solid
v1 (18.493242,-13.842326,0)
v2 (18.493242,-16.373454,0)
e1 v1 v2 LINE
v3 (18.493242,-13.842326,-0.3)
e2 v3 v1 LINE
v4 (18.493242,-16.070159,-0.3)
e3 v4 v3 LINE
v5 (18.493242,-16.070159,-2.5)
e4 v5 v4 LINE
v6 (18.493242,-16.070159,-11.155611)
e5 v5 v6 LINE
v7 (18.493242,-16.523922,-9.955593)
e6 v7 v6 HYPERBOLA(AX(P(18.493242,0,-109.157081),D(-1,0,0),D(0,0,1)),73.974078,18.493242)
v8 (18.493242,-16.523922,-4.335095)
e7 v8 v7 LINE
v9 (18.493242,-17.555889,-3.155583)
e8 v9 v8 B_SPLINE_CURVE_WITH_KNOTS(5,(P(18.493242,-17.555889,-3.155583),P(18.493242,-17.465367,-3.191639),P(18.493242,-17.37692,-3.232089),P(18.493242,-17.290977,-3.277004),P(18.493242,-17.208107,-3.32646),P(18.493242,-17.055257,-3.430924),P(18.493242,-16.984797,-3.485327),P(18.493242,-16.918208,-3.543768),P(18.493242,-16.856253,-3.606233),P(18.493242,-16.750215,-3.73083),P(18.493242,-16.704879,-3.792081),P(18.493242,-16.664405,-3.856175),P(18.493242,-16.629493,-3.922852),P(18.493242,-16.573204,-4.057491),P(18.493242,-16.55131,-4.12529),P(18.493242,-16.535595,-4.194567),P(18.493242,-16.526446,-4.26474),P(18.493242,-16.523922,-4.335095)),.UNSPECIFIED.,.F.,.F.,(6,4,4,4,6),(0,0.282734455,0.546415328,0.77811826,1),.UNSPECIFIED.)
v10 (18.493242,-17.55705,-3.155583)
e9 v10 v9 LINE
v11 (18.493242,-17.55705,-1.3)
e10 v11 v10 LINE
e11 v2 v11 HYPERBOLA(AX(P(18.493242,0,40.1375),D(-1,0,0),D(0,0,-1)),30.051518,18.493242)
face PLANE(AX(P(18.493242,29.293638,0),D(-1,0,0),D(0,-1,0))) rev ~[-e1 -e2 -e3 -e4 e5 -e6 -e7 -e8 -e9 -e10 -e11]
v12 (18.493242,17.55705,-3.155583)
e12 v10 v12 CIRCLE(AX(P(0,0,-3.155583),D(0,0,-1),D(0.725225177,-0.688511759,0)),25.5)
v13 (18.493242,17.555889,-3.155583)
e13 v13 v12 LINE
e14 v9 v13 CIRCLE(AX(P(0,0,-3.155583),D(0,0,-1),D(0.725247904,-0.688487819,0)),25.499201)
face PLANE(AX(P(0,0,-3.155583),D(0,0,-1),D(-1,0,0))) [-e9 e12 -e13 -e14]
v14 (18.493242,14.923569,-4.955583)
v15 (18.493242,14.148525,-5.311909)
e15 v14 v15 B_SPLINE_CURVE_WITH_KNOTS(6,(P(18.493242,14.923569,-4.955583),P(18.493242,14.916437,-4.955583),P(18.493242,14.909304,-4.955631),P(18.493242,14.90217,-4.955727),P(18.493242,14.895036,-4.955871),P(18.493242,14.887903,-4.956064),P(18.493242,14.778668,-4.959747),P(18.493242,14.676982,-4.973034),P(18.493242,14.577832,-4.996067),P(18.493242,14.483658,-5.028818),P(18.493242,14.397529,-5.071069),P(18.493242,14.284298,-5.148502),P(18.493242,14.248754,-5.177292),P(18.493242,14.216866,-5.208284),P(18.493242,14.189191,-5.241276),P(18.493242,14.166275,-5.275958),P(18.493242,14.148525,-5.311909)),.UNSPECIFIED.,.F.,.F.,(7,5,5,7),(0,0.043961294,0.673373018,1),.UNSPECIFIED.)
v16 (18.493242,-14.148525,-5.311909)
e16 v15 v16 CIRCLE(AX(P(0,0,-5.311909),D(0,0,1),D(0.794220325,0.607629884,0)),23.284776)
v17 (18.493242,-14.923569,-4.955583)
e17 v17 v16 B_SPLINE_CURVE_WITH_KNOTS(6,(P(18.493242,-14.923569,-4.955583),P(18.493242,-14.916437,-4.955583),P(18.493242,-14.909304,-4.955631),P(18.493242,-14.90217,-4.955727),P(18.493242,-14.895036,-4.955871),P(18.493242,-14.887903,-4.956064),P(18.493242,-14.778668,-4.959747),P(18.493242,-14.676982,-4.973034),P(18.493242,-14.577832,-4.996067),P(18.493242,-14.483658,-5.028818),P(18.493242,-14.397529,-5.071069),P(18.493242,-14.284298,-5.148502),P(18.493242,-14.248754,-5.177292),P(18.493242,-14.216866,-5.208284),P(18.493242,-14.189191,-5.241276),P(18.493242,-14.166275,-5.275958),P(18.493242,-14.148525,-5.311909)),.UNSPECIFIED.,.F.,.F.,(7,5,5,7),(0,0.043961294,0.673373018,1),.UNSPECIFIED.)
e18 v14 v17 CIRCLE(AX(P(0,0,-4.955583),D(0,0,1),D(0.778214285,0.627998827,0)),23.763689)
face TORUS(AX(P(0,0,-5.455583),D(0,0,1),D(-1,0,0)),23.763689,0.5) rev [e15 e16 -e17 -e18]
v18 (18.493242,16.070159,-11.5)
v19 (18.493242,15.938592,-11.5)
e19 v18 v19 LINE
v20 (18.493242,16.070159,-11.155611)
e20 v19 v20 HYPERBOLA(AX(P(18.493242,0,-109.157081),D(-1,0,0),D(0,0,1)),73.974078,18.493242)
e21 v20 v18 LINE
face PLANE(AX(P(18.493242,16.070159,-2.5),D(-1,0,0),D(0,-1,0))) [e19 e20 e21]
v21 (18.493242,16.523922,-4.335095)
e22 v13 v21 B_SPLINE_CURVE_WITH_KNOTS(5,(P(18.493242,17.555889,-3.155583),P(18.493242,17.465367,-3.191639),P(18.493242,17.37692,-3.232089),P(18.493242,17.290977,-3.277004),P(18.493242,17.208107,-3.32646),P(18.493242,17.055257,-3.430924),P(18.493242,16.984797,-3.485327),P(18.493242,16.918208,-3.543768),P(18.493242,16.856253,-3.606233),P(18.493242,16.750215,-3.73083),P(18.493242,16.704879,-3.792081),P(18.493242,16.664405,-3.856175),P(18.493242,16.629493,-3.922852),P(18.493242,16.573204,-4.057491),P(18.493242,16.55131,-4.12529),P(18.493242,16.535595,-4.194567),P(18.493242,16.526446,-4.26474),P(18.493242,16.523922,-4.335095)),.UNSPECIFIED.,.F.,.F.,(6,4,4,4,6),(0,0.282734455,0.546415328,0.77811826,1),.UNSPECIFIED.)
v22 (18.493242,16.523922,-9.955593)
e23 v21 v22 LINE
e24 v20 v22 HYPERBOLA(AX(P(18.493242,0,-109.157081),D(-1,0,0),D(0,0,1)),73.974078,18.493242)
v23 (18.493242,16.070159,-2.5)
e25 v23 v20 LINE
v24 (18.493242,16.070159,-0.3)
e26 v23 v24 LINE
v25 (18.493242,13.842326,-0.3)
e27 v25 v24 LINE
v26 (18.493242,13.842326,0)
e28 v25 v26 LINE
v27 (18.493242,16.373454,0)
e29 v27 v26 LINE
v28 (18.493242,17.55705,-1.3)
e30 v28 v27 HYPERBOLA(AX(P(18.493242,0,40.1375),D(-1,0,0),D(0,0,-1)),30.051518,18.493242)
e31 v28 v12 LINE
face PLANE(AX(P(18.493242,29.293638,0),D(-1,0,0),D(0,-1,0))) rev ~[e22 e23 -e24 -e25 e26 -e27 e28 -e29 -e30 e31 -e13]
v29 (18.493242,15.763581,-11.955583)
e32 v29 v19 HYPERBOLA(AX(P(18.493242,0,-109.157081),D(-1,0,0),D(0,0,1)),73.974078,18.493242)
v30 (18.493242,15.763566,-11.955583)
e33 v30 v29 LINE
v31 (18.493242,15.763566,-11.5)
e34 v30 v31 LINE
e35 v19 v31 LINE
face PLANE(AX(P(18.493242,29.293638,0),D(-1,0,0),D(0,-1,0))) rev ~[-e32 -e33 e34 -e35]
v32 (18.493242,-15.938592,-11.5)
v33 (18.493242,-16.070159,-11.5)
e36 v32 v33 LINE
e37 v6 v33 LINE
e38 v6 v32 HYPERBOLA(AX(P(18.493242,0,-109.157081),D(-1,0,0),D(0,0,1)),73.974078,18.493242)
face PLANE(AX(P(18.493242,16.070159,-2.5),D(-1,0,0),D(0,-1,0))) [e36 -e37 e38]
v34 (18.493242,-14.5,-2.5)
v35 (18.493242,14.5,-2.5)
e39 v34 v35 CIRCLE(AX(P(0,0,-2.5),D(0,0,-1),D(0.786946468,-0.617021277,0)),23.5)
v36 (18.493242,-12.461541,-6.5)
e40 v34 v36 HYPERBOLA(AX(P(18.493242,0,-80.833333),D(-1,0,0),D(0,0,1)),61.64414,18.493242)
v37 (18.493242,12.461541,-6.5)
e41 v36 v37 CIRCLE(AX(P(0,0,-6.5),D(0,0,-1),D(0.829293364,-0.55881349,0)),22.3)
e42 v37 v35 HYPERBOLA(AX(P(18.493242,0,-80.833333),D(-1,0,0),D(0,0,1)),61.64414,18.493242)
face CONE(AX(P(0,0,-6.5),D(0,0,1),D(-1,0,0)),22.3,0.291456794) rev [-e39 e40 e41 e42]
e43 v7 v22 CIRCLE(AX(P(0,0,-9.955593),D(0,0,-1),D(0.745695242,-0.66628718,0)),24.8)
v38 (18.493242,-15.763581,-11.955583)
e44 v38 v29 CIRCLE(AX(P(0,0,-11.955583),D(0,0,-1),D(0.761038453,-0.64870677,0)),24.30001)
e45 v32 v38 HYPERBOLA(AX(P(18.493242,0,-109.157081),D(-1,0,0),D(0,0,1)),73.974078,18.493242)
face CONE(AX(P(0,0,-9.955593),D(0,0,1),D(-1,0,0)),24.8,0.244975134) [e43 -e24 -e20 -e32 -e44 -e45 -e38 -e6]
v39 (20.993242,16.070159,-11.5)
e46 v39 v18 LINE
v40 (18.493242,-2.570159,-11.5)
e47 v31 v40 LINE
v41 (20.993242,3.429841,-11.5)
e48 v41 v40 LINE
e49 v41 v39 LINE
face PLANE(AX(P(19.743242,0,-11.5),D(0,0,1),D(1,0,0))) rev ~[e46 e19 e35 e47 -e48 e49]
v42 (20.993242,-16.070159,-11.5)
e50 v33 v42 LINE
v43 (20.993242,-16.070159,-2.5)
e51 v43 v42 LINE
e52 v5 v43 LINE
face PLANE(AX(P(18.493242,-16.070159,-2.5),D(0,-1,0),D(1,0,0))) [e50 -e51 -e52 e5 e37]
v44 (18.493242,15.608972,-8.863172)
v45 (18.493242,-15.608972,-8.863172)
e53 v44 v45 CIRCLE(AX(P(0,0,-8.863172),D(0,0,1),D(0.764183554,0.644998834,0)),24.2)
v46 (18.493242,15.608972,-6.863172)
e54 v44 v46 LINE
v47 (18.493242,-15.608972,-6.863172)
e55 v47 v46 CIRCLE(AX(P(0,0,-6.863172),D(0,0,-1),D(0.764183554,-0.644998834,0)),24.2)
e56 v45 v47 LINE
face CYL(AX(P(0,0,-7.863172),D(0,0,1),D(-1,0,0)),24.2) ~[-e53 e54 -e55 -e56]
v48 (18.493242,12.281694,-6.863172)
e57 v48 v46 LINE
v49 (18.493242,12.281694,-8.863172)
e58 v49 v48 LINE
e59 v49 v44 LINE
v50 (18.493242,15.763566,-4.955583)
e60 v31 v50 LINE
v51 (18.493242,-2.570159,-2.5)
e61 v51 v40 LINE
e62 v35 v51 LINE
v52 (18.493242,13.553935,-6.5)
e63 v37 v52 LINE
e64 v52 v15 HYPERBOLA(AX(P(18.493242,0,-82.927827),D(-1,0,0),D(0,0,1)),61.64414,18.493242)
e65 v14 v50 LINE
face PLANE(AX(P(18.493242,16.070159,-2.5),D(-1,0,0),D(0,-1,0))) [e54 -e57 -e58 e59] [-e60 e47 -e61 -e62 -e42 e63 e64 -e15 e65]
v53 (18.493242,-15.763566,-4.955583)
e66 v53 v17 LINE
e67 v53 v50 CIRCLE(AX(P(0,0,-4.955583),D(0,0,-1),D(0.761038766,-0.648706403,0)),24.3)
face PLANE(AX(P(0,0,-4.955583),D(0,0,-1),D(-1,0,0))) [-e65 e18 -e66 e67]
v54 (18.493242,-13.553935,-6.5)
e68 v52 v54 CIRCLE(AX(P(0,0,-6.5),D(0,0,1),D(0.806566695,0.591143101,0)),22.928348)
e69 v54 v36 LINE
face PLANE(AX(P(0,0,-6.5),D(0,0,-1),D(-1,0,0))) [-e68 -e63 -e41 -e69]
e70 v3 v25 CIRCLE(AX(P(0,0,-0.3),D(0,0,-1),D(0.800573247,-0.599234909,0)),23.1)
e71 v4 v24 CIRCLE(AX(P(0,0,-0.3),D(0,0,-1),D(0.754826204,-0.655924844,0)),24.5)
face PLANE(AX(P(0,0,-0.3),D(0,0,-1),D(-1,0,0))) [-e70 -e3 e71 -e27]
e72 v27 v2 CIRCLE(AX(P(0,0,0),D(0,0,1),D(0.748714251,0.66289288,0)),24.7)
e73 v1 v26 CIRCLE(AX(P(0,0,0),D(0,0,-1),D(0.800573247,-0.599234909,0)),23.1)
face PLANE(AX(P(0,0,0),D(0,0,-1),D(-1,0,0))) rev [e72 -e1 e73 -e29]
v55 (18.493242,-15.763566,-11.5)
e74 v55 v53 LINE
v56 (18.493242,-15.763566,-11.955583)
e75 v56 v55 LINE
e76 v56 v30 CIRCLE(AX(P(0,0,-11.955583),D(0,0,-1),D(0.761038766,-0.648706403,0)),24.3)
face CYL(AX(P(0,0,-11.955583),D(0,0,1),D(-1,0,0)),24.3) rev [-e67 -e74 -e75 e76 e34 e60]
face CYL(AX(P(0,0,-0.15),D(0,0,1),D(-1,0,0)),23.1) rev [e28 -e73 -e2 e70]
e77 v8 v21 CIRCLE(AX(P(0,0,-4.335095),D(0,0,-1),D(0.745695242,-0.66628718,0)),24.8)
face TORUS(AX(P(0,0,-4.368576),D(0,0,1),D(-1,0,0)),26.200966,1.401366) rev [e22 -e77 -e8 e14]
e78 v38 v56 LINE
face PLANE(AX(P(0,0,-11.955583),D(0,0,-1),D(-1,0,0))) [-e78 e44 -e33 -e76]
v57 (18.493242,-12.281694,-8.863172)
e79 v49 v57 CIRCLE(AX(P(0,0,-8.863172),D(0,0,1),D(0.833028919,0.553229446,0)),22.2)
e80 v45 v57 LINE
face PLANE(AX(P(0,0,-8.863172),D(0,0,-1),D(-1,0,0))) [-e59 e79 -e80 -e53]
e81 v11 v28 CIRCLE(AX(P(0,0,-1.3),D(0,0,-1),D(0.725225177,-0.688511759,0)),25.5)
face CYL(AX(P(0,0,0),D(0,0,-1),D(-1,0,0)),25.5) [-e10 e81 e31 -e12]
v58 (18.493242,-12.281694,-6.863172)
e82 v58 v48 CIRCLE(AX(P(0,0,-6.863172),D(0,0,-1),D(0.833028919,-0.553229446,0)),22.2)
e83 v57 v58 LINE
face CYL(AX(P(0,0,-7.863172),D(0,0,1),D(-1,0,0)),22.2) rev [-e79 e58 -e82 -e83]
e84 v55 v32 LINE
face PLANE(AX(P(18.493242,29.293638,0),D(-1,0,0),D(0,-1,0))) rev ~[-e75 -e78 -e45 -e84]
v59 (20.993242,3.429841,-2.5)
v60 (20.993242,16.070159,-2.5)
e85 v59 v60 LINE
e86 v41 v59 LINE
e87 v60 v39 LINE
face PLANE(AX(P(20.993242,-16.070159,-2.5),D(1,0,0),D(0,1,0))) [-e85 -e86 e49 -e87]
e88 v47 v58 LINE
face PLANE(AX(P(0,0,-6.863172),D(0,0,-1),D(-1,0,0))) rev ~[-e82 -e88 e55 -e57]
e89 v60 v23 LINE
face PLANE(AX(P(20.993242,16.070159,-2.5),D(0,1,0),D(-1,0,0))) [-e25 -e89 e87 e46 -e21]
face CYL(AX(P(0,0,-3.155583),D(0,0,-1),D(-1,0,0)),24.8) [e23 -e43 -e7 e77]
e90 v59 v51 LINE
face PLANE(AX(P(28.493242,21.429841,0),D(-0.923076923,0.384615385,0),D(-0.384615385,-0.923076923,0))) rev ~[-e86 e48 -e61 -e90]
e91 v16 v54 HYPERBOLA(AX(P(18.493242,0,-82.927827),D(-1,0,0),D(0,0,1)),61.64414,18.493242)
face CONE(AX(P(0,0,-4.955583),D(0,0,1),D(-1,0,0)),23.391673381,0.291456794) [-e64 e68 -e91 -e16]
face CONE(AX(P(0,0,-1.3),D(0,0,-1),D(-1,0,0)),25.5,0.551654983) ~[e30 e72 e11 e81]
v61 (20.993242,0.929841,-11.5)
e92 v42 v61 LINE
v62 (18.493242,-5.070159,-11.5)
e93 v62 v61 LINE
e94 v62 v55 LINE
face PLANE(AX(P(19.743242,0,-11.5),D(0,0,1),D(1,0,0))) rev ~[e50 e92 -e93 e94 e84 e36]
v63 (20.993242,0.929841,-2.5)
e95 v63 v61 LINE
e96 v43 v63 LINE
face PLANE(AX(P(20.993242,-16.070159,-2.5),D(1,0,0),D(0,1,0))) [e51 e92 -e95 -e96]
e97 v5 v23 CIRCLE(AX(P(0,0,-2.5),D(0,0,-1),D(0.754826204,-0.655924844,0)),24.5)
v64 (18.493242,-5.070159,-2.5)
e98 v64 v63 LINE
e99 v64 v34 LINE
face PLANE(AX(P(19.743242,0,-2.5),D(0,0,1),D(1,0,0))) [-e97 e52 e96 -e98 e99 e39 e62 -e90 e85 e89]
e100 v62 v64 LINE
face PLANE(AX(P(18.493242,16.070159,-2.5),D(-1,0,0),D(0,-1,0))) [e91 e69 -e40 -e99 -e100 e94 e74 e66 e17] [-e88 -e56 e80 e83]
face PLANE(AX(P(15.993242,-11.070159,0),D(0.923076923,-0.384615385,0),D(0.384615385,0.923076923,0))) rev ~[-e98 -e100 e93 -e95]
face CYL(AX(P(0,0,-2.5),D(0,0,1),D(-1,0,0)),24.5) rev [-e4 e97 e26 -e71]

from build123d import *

# Parameters (mm, degrees)
F0_W      = 1.4
F0_H      = 0.3
F0_W_2    = 2
F0_H_2    = 2
F4_SIZE2  = 0.49999
F4_SIZE   = 1.99999
F5_R      = 0.5
F7_DEPTH  = 25
F9_DEPTH  = 9
F11_DEPTH = 100


# Not quite as in the source:
# - a fillet or chamfer that OpenCascade refuses, or shapes differently, is made with other operations: its cross-section is extruded or revolved along the edge and cut away or added
# - a fillet or chamfer is up to 0.001 mm smaller than in the source, because OpenCascade refuses the exact size


with BuildPart() as f1:
    # F0 (on Front) → F1 (revolve)
    with BuildSketch(Plane.XZ):
        Polygon((-24.5, 0), (-25.5, 0), (-25.5, -3.1555826106), (-24.8, -3.1555826106), (-24.8, -11.9555826106), (-24.3, -11.9555826106), (-24.3, -4.9555826106), (-23.391673381, -4.9555826106), (-22.9283481642, -6.5), (-22.3, -6.5), (-23.5, -2.5), (-24.5, -2.5), (-24.5, -0.3), align=None)
        with Locations((-23.8, -0.15)):
            Rectangle(F0_W, F0_H)
    revolve(axis=Axis((0, 0, 1.0689813644), (0, 0, -1)))

    # F2: chamfer of 0.8 x 1.3 on 1 edges, made by hand

    # F2_s1 → F2_t2 (revolve, cut)
    with BuildSketch(Plane.XZ):
        Polygon((-25.5, -1.3), (-24.7, 0), (-25.5, 0), align=None)
    revolve(axis=Axis((0, 0, 0), (0, 0, -1)), mode=Mode.SUBTRACT)

    # F3: fillet of radius 1.4 on 1 edges, made by hand

    # F3_s1 → F3_t2 (revolve)
    with BuildSketch(Plane.XZ):
        with BuildLine():
            ThreePointArc((-25.4997998621, -3.1552362801), (-24.9872079854, -3.6681342757), (-24.7996, -4.3685755865))
            Line((-24.7996, -4.3685755865), (-24.6594634315, -4.3685755865))
            ThreePointArc((-24.6594634315, -4.3685755865), (-24.6598634315, -3.7620790985), (-24.6598634315, -3.1555826106))
            Line((-24.6598634315, -3.1555826106), (-24.8, -3.015446042))
            ThreePointArc((-24.8, -3.015446042), (-25.1498999311, -3.015446042), (-25.4296832798, -3.0339023494))
            Line((-25.4296832798, -3.0339023494), (-25.4997998621, -3.1552362801))
        make_face()
    revolve(axis=Axis((0, 0, -3.1555826106), (0, 0, -1)))

    # F4 (size 2 and 0.5 in the source; OpenCascade refuses exactly that, so slightly less here)
    f4_edges = [f1.edges().sort_by_distance(p)[0] for p in [
        (24.8, 0, -11.955583),
    ]]
    chamfer(f4_edges, length=F4_SIZE, length2=F4_SIZE2)

    # F5
    f5_edges = [f1.edges().sort_by_distance(p)[0] for p in [
        (23.391673, 0, -4.955583),
    ]]
    fillet(f5_edges, radius=F5_R)


with BuildPart() as f1b:
    # F0 (on Front) → F1, piece 2 (revolve)
    with BuildSketch(Plane.XZ):
        with Locations((-23.2, -7.8631715626)):
            Rectangle(F0_W_2, F0_H_2)
    revolve(axis=Axis((0, 0, 1.0689813644), (0, 0, -1)))


with BuildPart() as f7_tool:
    # F6 (on Top) → F7 (new body)
    with BuildSketch(Plane.XY):
        Polygon((18.4932420089, 17.5570498661), (18.4932420089, 14.5), (18.4932420089, -14.5), (18.4932420089, -17.5570498661), (23.4932420089, -17.5570498661), (23.4932420089, 17.5570498661), align=None)
        Polygon((18.4932420089, 29.2936375588), (18.4932420089, 17.5570498661), (23.4932420089, 17.5570498661), (23.4932420089, -17.5570498661), (18.4932420089, -17.5570498661), (18.4932420089, -27.3348336816), (60.3667099652, -27.3348336816), (60.3667099652, 29.2936375588), align=None)
    extrude(amount=-F7_DEPTH)


with BuildPart() as f1_1:
    add(f1.part)

    # F7: cut by f7_tool
    add(f7_tool.part, mode=Mode.SUBTRACT)



with BuildPart() as f1b_1:
    add(f1b.part)

    # F7: cut by f7_tool
    add(f7_tool.part, mode=Mode.SUBTRACT)


with BuildPart() as f1_2:
    add(f1_1.part)

    add(f1b_1.part)  # F9 merges F1b
    # F8 (on face) → F9 (join)
    with BuildSketch(Plane.XY.offset(-2.5)):
        Polygon((20.9932420089, 16.07015868), (18.4932420089, 16.07015868), (18.4932420089, 14.5), (18.4932420089, -14.5), (18.4932420089, -16.07015868), (20.9932420089, -16.07015868), align=None)
    extrude(amount=-F9_DEPTH)

    # F10 (on Top) → F11 (cut)
    with BuildSketch(Plane.XY):
        Polygon((28.4932420089, 21.42984132), (15.9932420089, -8.57015868), (15.9932420089, -11.07015868), (28.4932420089, 18.92984132), align=None)
    extrude(amount=-F11_DEPTH, mode=Mode.SUBTRACT)


solid = f1_2.part
